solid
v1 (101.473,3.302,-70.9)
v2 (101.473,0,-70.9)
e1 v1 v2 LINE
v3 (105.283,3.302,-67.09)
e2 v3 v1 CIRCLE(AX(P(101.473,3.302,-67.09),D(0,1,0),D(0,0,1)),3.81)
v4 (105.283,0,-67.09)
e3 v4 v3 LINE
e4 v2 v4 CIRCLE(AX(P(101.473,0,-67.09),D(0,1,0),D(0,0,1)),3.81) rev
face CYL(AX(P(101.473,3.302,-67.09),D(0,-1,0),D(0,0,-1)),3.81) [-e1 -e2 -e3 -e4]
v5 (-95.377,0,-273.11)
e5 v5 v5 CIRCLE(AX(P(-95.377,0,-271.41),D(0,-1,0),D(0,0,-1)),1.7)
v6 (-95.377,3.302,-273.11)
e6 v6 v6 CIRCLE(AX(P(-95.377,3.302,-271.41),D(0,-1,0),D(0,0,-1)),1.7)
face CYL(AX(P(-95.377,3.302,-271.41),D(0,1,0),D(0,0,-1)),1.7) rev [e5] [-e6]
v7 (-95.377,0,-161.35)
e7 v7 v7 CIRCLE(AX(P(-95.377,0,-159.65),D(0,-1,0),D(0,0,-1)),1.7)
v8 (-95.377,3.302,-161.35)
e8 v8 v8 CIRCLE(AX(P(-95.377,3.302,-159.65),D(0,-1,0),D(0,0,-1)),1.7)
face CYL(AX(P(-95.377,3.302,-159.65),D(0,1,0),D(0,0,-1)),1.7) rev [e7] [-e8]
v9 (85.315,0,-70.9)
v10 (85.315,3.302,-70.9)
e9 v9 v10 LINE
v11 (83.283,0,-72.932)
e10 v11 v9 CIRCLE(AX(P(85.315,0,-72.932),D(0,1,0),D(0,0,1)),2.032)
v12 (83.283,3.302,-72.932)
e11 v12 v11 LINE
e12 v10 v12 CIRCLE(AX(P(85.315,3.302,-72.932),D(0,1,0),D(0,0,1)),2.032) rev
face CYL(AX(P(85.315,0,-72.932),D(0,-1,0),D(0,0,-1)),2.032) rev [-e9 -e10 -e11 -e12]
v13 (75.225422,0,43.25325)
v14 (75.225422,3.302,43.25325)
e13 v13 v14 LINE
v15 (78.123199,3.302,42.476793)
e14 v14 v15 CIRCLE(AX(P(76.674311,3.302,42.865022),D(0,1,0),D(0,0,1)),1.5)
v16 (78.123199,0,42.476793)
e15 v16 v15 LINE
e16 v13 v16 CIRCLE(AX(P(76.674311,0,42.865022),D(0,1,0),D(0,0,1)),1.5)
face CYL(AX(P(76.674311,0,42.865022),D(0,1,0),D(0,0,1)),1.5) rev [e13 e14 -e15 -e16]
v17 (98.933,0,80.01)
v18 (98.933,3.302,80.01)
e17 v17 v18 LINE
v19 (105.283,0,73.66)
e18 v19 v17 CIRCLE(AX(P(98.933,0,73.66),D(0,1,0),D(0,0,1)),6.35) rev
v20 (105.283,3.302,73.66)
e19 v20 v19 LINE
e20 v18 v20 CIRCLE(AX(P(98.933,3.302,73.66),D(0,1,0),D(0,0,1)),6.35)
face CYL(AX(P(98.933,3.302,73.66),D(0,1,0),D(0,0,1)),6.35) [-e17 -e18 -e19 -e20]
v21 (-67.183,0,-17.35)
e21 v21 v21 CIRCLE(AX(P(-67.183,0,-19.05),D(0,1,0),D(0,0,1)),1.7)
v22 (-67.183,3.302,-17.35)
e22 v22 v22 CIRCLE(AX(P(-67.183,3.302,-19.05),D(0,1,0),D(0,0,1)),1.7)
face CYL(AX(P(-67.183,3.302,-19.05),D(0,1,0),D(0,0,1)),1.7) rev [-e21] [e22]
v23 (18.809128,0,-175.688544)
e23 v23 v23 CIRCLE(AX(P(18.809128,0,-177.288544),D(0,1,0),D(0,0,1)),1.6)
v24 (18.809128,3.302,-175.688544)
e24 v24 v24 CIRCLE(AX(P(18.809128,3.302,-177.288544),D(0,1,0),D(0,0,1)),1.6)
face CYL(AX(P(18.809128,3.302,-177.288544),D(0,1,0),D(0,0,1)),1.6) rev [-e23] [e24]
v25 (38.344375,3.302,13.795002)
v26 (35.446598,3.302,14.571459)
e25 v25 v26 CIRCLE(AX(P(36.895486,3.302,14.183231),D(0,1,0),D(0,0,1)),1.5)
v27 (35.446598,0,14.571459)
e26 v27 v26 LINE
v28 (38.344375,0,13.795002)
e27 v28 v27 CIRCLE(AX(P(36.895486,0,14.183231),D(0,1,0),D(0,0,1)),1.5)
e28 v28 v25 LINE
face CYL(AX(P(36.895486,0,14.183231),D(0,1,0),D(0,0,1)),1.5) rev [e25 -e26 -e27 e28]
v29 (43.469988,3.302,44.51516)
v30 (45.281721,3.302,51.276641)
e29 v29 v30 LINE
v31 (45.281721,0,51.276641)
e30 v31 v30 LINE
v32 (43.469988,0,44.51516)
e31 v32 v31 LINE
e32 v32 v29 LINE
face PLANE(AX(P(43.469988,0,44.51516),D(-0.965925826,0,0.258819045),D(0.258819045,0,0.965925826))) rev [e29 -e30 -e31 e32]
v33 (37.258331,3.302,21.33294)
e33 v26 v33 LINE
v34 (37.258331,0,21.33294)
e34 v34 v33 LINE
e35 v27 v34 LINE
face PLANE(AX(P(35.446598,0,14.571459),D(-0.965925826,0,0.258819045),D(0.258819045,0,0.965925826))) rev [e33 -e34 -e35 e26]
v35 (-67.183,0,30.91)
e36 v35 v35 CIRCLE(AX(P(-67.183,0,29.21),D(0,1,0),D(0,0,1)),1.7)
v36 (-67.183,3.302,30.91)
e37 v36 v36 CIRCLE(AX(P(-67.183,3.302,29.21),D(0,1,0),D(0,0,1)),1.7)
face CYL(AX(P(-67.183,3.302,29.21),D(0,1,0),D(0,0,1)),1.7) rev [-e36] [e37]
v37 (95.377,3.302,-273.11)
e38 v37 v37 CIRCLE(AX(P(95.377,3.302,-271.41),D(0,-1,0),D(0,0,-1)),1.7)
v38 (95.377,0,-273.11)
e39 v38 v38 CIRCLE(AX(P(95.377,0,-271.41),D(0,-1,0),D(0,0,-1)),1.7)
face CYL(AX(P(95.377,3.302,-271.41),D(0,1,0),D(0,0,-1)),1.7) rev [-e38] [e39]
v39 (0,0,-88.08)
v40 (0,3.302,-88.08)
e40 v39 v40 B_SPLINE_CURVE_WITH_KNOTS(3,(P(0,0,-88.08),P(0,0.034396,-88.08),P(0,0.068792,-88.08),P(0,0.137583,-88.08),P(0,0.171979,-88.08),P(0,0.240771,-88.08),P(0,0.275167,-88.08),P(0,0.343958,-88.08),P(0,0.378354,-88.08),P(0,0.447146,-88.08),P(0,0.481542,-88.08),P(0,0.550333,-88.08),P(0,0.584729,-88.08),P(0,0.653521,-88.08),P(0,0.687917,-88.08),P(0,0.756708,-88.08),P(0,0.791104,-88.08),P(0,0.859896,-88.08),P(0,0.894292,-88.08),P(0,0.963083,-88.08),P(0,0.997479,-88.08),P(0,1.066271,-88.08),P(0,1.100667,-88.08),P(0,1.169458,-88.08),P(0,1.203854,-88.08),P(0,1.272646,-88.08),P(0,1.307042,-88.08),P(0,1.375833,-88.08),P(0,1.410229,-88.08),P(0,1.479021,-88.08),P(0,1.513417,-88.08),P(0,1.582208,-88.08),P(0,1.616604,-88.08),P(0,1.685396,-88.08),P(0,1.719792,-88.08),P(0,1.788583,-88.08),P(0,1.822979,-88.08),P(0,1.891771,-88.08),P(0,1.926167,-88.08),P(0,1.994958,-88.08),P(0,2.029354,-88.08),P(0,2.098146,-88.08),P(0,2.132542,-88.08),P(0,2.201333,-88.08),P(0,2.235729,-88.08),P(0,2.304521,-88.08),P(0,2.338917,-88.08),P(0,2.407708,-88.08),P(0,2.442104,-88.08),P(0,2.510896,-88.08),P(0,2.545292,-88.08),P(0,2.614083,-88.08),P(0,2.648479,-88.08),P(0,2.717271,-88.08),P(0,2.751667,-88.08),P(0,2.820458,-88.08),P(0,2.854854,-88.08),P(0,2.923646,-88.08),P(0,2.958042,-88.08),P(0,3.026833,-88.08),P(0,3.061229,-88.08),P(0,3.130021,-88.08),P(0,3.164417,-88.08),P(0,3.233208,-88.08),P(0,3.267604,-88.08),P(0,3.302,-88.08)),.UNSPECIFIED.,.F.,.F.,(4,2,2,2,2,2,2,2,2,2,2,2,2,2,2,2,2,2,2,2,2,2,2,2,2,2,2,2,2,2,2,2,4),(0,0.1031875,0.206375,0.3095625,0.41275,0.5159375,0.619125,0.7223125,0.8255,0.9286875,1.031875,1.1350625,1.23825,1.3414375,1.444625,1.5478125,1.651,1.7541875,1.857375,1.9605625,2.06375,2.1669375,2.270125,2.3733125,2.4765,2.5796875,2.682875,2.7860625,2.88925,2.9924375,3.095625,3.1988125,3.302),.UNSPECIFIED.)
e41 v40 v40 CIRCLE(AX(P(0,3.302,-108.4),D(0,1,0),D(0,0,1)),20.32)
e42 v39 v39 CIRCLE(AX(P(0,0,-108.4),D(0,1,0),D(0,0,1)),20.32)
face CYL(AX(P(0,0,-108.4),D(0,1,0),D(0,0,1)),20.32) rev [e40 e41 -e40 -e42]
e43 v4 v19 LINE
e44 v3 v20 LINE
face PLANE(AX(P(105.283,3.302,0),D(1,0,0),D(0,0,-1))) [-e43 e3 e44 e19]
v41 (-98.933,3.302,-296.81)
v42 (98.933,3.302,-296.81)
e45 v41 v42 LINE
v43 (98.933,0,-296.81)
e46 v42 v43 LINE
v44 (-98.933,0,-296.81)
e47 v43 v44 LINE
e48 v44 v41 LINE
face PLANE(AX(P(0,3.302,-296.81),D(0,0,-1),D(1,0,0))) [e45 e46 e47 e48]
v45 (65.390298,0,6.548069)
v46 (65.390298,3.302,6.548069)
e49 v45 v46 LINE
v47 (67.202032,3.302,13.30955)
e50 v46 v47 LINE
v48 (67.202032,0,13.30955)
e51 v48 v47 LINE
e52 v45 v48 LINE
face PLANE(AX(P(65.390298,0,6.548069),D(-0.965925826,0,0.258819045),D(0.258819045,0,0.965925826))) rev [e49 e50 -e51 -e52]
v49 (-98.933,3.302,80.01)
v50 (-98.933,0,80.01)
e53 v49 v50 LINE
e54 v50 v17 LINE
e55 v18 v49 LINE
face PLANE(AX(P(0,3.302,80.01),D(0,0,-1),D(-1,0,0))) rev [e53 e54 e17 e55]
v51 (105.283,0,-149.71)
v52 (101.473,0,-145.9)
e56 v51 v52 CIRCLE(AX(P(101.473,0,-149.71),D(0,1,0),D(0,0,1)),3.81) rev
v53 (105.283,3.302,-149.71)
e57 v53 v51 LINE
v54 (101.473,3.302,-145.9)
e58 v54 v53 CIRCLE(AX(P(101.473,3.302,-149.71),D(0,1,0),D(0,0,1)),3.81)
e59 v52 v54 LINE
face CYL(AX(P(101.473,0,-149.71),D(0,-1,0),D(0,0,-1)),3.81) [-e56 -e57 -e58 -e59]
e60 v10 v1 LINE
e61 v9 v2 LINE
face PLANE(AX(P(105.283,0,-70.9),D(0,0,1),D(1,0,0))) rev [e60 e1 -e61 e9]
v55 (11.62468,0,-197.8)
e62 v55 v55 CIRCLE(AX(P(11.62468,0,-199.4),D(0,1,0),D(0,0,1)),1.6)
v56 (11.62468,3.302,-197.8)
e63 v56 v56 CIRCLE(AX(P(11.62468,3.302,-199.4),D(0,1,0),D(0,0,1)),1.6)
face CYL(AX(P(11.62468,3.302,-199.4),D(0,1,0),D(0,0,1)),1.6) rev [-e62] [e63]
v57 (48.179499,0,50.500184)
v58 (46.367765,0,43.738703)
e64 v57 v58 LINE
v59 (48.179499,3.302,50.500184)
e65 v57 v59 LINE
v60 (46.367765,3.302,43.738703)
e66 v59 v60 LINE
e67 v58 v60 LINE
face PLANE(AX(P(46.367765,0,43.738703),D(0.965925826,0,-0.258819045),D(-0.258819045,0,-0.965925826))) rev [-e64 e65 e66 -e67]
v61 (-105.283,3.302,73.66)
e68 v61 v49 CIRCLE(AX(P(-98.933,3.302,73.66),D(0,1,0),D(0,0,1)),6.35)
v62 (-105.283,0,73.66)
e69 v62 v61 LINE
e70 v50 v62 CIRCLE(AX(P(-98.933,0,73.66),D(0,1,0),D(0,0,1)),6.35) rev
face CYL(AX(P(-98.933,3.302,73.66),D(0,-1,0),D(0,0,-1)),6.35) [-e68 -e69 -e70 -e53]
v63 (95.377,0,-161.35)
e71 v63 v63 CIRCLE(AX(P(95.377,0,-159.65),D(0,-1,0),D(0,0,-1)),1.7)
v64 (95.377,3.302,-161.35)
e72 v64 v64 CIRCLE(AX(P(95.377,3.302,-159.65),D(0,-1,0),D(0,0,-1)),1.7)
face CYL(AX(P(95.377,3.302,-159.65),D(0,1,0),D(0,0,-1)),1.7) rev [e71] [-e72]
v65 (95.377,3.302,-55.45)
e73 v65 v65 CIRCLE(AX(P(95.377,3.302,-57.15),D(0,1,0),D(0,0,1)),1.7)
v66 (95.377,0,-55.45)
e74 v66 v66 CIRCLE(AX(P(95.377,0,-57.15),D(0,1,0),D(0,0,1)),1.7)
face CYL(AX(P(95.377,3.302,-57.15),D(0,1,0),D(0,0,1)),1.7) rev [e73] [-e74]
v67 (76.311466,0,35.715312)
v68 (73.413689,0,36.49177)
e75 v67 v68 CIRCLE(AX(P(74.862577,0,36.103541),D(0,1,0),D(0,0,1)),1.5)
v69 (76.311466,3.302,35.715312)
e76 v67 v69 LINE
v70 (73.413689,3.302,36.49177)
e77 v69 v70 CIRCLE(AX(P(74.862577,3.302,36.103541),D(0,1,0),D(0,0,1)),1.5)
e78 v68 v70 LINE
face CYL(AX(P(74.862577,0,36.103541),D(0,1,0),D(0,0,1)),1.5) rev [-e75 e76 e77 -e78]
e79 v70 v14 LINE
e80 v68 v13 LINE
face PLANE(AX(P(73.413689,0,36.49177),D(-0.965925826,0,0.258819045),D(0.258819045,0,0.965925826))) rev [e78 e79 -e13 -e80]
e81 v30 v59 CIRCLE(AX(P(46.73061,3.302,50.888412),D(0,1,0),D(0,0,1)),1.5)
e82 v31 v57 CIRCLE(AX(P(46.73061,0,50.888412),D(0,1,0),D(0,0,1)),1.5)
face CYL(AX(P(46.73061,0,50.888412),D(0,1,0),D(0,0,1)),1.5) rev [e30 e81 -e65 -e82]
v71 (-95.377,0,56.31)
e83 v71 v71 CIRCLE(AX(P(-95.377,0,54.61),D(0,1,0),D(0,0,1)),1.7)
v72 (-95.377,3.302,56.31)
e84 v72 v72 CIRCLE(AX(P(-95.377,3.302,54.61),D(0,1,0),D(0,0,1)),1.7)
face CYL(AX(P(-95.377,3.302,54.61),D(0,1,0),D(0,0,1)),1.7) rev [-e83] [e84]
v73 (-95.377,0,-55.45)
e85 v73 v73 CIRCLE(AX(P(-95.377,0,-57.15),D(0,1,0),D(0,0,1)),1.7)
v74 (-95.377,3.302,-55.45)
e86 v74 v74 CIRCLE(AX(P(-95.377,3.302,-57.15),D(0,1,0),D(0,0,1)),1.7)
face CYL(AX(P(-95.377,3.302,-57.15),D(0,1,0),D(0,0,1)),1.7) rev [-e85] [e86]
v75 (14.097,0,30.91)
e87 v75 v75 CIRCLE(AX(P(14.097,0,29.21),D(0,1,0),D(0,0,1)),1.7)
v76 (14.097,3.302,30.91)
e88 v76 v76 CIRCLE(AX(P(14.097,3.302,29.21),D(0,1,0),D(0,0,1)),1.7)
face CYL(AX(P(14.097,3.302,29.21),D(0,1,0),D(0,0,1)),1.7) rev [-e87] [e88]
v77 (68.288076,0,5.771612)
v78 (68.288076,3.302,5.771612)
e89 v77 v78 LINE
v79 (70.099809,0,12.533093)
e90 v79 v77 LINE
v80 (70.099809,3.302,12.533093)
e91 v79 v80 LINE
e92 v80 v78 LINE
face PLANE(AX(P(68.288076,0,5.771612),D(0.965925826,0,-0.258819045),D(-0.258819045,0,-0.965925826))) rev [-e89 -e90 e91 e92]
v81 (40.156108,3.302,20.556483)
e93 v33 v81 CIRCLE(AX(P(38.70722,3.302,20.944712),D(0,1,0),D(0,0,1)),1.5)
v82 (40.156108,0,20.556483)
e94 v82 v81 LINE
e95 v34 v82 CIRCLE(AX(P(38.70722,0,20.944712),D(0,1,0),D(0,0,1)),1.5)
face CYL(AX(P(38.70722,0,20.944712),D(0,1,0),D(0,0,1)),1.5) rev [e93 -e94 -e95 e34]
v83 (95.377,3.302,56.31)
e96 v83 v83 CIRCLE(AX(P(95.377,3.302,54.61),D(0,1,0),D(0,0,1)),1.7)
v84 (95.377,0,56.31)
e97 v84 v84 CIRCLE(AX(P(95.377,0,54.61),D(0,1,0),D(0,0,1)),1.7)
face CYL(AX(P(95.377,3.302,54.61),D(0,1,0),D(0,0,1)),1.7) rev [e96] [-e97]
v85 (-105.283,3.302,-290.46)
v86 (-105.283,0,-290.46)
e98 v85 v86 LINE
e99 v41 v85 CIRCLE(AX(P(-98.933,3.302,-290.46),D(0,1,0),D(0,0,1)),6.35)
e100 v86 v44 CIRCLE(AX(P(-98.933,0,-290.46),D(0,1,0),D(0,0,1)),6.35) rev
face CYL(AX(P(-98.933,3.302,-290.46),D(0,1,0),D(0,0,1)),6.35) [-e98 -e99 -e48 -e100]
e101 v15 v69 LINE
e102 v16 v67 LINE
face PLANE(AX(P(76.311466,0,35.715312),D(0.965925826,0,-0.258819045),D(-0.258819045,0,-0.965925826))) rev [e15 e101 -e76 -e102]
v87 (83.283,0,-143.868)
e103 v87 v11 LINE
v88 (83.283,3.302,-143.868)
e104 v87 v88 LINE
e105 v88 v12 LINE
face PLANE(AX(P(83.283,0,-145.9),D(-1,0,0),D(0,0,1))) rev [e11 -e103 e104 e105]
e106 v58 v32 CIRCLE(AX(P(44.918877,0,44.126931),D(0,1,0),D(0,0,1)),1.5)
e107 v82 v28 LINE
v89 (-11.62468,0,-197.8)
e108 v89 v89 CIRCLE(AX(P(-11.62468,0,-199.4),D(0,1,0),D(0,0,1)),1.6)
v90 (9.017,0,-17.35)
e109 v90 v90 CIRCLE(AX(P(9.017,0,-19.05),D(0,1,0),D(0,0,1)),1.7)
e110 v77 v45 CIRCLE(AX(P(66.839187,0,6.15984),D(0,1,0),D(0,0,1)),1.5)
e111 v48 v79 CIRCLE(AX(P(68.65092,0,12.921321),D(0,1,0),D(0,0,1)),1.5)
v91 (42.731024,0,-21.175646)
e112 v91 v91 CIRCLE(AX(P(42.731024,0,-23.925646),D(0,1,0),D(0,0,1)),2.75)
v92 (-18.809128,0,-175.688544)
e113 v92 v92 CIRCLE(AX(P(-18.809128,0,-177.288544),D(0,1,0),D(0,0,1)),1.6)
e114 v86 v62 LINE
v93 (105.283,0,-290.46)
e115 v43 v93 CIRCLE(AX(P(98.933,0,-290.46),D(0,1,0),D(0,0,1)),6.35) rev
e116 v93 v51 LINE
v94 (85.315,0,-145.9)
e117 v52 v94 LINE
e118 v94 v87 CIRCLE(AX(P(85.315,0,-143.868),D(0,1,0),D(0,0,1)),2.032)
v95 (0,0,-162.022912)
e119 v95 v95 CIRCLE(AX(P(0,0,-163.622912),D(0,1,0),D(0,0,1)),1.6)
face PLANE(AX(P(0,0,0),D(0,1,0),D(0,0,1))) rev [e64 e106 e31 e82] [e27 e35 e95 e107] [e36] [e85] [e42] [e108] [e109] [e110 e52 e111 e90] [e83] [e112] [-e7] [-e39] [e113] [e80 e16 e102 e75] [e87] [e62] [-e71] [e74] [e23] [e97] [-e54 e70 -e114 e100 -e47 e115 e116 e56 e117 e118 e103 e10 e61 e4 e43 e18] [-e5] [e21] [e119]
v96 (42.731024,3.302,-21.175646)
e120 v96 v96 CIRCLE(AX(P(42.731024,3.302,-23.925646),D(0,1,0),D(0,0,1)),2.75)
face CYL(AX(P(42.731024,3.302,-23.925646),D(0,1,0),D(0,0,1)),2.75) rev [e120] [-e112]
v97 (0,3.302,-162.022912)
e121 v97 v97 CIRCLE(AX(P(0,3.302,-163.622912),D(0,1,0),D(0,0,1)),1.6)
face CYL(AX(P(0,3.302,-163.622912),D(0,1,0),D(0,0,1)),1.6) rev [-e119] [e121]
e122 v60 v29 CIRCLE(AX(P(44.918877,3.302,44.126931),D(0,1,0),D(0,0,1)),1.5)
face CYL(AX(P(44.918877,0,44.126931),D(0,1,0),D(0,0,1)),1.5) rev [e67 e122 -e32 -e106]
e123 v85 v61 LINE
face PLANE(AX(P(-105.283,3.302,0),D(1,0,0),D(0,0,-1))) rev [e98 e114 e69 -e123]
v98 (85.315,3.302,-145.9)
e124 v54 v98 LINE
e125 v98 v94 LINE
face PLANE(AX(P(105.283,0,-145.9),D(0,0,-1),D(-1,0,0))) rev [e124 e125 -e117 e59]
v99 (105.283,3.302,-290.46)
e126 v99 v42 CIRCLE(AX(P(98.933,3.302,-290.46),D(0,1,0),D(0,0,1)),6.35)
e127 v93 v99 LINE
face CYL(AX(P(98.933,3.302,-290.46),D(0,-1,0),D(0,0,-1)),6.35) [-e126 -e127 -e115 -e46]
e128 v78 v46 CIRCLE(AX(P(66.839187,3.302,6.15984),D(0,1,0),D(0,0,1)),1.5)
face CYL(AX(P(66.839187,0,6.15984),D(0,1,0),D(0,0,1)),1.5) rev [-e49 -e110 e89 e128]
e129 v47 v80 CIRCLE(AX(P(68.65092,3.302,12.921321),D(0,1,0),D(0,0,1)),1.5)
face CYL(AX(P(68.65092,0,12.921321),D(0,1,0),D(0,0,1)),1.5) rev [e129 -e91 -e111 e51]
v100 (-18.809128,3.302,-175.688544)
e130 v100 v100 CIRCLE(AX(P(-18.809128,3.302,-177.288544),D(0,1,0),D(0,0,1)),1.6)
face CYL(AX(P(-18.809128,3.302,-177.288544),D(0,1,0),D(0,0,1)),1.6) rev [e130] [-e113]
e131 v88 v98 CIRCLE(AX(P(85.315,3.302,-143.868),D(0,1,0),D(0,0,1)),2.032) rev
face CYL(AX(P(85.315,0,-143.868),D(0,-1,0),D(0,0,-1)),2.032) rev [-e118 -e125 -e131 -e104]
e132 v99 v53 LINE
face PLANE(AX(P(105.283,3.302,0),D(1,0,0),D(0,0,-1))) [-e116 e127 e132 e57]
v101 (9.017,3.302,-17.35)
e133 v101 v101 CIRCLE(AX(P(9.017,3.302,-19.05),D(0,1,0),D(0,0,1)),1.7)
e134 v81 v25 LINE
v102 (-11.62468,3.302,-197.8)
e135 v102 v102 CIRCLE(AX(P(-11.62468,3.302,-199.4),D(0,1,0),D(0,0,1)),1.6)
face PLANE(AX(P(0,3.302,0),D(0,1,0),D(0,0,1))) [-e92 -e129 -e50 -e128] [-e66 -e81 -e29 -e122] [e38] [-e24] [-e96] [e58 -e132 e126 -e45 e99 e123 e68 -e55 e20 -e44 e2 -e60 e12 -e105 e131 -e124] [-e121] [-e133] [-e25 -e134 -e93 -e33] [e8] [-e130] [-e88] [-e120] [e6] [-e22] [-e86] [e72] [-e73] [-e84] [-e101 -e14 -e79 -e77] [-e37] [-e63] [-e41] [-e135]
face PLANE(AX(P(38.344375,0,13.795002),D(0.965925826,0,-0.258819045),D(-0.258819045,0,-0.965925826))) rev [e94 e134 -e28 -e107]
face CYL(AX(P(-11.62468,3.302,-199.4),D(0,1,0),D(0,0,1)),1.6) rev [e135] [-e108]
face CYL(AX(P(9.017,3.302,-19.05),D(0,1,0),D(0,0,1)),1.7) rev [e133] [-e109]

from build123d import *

# Parameters (mm, degrees)
BOSS_EXTRUDE1_DEPTH     = 3.302
M3_CLEARANCE_HOLE1_D    = 3.4
SKETCH6_W               = 210.566
SKETCH6_H               = 3.302
BOSS_EXTRUDE3_DEPTH     = 1.62
SKETCH7_W               = 210.566
SKETCH7_H               = 3.302
BOSS_EXTRUDE4_DEPTH     = 5.18
M3_CLEARANCE_HOLE2_D    = 3.4
SKETCH21_R              = 20.32
CUT_EXTRUDE1_DEPTH      = 336.371396057
ADVANCEDHOLE1_OUTLINE_R = 1.6
ADVANCEDHOLE1_DEPTH     = 3.302
CUT_EXTRUDE2_REACH      = 337.371
SKETCH33_W              = 167.386
SKETCH33_H              = 21.59
FILLET1_R               = 6.35
CUT_EXTRUDE3_DEPTH      = 315.946962825
M5_CLEARANCE_HOLE1_D    = 5.5
M3_CLEARANCE_HOLE3_D    = 3.4
SKETCH40_W              = 22
SKETCH40_H              = 75
CUT_EXTRUDE4_DEPTH      = 315.946962825
FILLET2_R               = 3.81
FILLET3_R               = 2.032


# Read off the part's stored shape, not the designer's step: AdvancedHole1
with BuildPart() as part:
    # Sketch1 → Boss-Extrude1 (new body)
    with BuildSketch(Plane(origin=(0, 0, 0), x_dir=(1, 0, 0), z_dir=(0, 1, 0))):
        Polygon((105.283, -80.01), (105.283, 101.6), (-105.283, 101.6), (-105.283, -80.01), (-83.693, -80.01), (-83.693, -101.6), (83.693, -101.6), (83.693, -80.01), align=None)
    extrude(amount=BOSS_EXTRUDE1_DEPTH)

    # M3 Clearance Hole1 (through all)
    with Locations(Plane(origin=(0, 3.302, 0), x_dir=(1, 0, 0), z_dir=(0, 1, 0))):
        with Locations((-95.377, -54.61), (-95.377, 57.15), (95.377, 57.15), (95.377, -54.61)):
            Hole(M3_CLEARANCE_HOLE1_D / 2)

    # Sketch6 → Boss-Extrude3 (add)
    with BuildSketch(Plane(origin=(0, 0, -101.6), x_dir=(-1, 0, 0), z_dir=(0, 0, -1))):
        with Locations((0, 1.651)):
            Rectangle(SKETCH6_W, SKETCH6_H)
    extrude(amount=BOSS_EXTRUDE3_DEPTH)

    # Sketch7 → Boss-Extrude4 (add)
    with BuildSketch(Plane(origin=(0, 0, -103.22), x_dir=(-1, 0, 0), z_dir=(0, 0, -1))):
        with Locations((0, 1.651)):
            Rectangle(SKETCH7_W, SKETCH7_H)
    extrude(amount=BOSS_EXTRUDE4_DEPTH)


with BuildPart() as body_2:
    # Mirror2: mirrored copy
    add(part.part.mirror(Plane(origin=(0, 0, -108.4), x_dir=(1, 0, 0), z_dir=(0, 0, -1))))


with BuildPart() as part_1:
    add(part.part)

    # Combine1: union body 2
    add(body_2.part)

    # M3 Clearance Hole2 (through all)
    with Locations(Plane(origin=(0, 3.302, 0), x_dir=(1, 0, 0), z_dir=(0, 1, 0))):
        with Locations((-58.293, -91.6), (58.293, -91.6), (-58.293, 308.4), (58.293, 308.4)):
            Hole(M3_CLEARANCE_HOLE2_D / 2)

    # Sketch21 → Cut-Extrude1 (cut, through all)
    with BuildSketch(Plane(origin=(0, 3.302, 0), x_dir=(1, 0, 0), z_dir=(0, 1, 0))):
        with Locations(Location((0, 108.4, 0), (0, 0, 270))):
            Circle(SKETCH21_R)
    extrude(amount=-CUT_EXTRUDE1_DEPTH, mode=Mode.SUBTRACT)

    # AdvancedHole1 outline → AdvancedHole1 (cut)
    with BuildSketch(Plane(origin=(0, 0, 0), x_dir=(1, 0, 0), z_dir=(0, 1, 0))):
        with Locations((-11.624680448, 199.4)):
            Circle(ADVANCEDHOLE1_OUTLINE_R)
        with Locations((-18.809128073, 177.28854382)):
            Circle(ADVANCEDHOLE1_OUTLINE_R)
        with Locations((0, 163.62291236)):
            Circle(ADVANCEDHOLE1_OUTLINE_R)
        with Locations((18.809128073, 177.28854382)):
            Circle(ADVANCEDHOLE1_OUTLINE_R)
        with Locations((11.624680448, 199.4)):
            Circle(ADVANCEDHOLE1_OUTLINE_R)
    extrude(amount=ADVANCEDHOLE1_DEPTH, mode=Mode.SUBTRACT)

    # Sketch33 → Cut-Extrude2 (cut, up to next)
    with BuildSketch(Plane(origin=(0, 3.302, 0), x_dir=(1, 0, 0), z_dir=(0, 1, 0)), mode=Mode.PRIVATE) as cut_extrude2_sk1:
        with Locations((0, 307.605)):
            Rectangle(SKETCH33_W, SKETCH33_H)
    cut_extrude2_tool1 = extrude(cut_extrude2_sk1.sketch, amount=-CUT_EXTRUDE2_REACH, mode=Mode.PRIVATE) & part_1.part
    # Sketch33 → Cut-Extrude2 (cut, up to next)
    with BuildSketch(Plane(origin=(0, 3.302, 0), x_dir=(1, 0, 0), z_dir=(0, 1, 0)), mode=Mode.PRIVATE) as cut_extrude2_sk2:
        with Locations((0, -90.805)):
            Rectangle(SKETCH33_W, SKETCH33_H)
    cut_extrude2_tool2 = extrude(cut_extrude2_sk2.sketch, amount=-CUT_EXTRUDE2_REACH, mode=Mode.PRIVATE) & part_1.part
    add(cut_extrude2_tool1.solids().sort_by_distance((0, 3.302, -307.605))[0], mode=Mode.SUBTRACT)
    add(cut_extrude2_tool2.solids().sort_by_distance((0, 3.302, 90.805))[0], mode=Mode.SUBTRACT)

    # Fillet1
    fillet1_edges = [part_1.edges().sort_by_distance(p)[0] for p in [
        (-105.283, 1.651, 80.01),
        (105.283, 1.651, 80.01),
        (105.283, 1.651, -296.81),
        (-105.283, 1.651, -296.81),
    ]]
    fillet(fillet1_edges, radius=FILLET1_R)

    # Sketch24 → Cut-Extrude3 (cut, through all)
    with BuildSketch(Plane(origin=(0, 3.302, 0), x_dir=(1, 0, 0), z_dir=(0, 1, 0))):
        with BuildLine():
            Line((68.288075685, -5.771611822), (70.099809001, -12.533092606))
            ThreePointArc((70.099809001, -12.533092606), (69.039148829, -14.370209913), (67.202031522, -13.309549741))
            Line((67.202031522, -13.309549741), (65.390298207, -6.548068957))
            ThreePointArc((65.390298207, -6.548068957), (66.450958378, -4.71095165), (68.288075685, -5.771611822))
        make_face()
        with BuildLine():
            Line((76.311466084, -35.715312437), (78.123199399, -42.476793221))
            ThreePointArc((78.123199399, -42.476793221), (77.062539228, -44.313910528), (75.22542192, -43.253250356))
            Line((75.22542192, -43.253250356), (73.413688605, -36.491769572))
            ThreePointArc((73.413688605, -36.491769572), (74.474348777, -34.654652265), (76.311466084, -35.715312437))
        make_face()
        with BuildLine():
            Line((38.34437507, -13.79500222), (40.156108386, -20.556483004))
            ThreePointArc((40.156108386, -20.556483004), (39.095448214, -22.393600311), (37.258330907, -21.332940139))
            Line((37.258330907, -21.332940139), (35.446597592, -14.571459355))
            ThreePointArc((35.446597592, -14.571459355), (36.507257763, -12.734342048), (38.34437507, -13.79500222))
        make_face()
        with BuildLine():
            Line((46.367765469, -43.738702835), (48.179498784, -50.500183619))
            ThreePointArc((48.179498784, -50.500183619), (47.118838613, -52.337300926), (45.281721306, -51.276640754))
            Line((45.281721306, -51.276640754), (43.46998799, -44.51515997))
            ThreePointArc((43.46998799, -44.51515997), (44.530648162, -42.678042663), (46.367765469, -43.738702835))
        make_face()
    extrude(amount=-CUT_EXTRUDE3_DEPTH, mode=Mode.SUBTRACT)

    # M5 Clearance Hole1 (through all)
    with Locations(Plane(origin=(0, 3.302, 0), x_dir=(1, 0, 0), z_dir=(0, 1, 0))):
        with Locations((42.731024346, 23.92564608)):
            Hole(M5_CLEARANCE_HOLE1_D / 2)

    # M3 Clearance Hole3 (through all)
    with Locations(Plane(origin=(0, 3.302, 0), x_dir=(1, 0, 0), z_dir=(0, 1, 0))):
        with Locations((9.017, 19.05), (14.097, -29.21), (-67.183, 19.05), (-67.183, -29.21)):
            Hole(M3_CLEARANCE_HOLE3_D / 2)

    # Sketch40 → Cut-Extrude4 (cut, through all)
    with BuildSketch(Plane(origin=(0, 3.302, 0), x_dir=(1, 0, 0), z_dir=(0, 1, 0))):
        with Locations((94.283, 108.4)):
            Rectangle(SKETCH40_W, SKETCH40_H)
    extrude(amount=-CUT_EXTRUDE4_DEPTH, mode=Mode.SUBTRACT)

    # Fillet2
    fillet2_edges = [part_1.edges().sort_by_distance(p)[0] for p in [
        (105.283, 1.651, -145.9),
        (105.283, 1.651, -70.9),
    ]]
    fillet(fillet2_edges, radius=FILLET2_R)

    # Fillet3
    fillet3_edges = [part_1.edges().sort_by_distance(p)[0] for p in [
        (83.283, 1.651, -70.9),
        (83.283, 1.651, -145.9),
    ]]
    fillet(fillet3_edges, radius=FILLET3_R)


solid = part_1.part
